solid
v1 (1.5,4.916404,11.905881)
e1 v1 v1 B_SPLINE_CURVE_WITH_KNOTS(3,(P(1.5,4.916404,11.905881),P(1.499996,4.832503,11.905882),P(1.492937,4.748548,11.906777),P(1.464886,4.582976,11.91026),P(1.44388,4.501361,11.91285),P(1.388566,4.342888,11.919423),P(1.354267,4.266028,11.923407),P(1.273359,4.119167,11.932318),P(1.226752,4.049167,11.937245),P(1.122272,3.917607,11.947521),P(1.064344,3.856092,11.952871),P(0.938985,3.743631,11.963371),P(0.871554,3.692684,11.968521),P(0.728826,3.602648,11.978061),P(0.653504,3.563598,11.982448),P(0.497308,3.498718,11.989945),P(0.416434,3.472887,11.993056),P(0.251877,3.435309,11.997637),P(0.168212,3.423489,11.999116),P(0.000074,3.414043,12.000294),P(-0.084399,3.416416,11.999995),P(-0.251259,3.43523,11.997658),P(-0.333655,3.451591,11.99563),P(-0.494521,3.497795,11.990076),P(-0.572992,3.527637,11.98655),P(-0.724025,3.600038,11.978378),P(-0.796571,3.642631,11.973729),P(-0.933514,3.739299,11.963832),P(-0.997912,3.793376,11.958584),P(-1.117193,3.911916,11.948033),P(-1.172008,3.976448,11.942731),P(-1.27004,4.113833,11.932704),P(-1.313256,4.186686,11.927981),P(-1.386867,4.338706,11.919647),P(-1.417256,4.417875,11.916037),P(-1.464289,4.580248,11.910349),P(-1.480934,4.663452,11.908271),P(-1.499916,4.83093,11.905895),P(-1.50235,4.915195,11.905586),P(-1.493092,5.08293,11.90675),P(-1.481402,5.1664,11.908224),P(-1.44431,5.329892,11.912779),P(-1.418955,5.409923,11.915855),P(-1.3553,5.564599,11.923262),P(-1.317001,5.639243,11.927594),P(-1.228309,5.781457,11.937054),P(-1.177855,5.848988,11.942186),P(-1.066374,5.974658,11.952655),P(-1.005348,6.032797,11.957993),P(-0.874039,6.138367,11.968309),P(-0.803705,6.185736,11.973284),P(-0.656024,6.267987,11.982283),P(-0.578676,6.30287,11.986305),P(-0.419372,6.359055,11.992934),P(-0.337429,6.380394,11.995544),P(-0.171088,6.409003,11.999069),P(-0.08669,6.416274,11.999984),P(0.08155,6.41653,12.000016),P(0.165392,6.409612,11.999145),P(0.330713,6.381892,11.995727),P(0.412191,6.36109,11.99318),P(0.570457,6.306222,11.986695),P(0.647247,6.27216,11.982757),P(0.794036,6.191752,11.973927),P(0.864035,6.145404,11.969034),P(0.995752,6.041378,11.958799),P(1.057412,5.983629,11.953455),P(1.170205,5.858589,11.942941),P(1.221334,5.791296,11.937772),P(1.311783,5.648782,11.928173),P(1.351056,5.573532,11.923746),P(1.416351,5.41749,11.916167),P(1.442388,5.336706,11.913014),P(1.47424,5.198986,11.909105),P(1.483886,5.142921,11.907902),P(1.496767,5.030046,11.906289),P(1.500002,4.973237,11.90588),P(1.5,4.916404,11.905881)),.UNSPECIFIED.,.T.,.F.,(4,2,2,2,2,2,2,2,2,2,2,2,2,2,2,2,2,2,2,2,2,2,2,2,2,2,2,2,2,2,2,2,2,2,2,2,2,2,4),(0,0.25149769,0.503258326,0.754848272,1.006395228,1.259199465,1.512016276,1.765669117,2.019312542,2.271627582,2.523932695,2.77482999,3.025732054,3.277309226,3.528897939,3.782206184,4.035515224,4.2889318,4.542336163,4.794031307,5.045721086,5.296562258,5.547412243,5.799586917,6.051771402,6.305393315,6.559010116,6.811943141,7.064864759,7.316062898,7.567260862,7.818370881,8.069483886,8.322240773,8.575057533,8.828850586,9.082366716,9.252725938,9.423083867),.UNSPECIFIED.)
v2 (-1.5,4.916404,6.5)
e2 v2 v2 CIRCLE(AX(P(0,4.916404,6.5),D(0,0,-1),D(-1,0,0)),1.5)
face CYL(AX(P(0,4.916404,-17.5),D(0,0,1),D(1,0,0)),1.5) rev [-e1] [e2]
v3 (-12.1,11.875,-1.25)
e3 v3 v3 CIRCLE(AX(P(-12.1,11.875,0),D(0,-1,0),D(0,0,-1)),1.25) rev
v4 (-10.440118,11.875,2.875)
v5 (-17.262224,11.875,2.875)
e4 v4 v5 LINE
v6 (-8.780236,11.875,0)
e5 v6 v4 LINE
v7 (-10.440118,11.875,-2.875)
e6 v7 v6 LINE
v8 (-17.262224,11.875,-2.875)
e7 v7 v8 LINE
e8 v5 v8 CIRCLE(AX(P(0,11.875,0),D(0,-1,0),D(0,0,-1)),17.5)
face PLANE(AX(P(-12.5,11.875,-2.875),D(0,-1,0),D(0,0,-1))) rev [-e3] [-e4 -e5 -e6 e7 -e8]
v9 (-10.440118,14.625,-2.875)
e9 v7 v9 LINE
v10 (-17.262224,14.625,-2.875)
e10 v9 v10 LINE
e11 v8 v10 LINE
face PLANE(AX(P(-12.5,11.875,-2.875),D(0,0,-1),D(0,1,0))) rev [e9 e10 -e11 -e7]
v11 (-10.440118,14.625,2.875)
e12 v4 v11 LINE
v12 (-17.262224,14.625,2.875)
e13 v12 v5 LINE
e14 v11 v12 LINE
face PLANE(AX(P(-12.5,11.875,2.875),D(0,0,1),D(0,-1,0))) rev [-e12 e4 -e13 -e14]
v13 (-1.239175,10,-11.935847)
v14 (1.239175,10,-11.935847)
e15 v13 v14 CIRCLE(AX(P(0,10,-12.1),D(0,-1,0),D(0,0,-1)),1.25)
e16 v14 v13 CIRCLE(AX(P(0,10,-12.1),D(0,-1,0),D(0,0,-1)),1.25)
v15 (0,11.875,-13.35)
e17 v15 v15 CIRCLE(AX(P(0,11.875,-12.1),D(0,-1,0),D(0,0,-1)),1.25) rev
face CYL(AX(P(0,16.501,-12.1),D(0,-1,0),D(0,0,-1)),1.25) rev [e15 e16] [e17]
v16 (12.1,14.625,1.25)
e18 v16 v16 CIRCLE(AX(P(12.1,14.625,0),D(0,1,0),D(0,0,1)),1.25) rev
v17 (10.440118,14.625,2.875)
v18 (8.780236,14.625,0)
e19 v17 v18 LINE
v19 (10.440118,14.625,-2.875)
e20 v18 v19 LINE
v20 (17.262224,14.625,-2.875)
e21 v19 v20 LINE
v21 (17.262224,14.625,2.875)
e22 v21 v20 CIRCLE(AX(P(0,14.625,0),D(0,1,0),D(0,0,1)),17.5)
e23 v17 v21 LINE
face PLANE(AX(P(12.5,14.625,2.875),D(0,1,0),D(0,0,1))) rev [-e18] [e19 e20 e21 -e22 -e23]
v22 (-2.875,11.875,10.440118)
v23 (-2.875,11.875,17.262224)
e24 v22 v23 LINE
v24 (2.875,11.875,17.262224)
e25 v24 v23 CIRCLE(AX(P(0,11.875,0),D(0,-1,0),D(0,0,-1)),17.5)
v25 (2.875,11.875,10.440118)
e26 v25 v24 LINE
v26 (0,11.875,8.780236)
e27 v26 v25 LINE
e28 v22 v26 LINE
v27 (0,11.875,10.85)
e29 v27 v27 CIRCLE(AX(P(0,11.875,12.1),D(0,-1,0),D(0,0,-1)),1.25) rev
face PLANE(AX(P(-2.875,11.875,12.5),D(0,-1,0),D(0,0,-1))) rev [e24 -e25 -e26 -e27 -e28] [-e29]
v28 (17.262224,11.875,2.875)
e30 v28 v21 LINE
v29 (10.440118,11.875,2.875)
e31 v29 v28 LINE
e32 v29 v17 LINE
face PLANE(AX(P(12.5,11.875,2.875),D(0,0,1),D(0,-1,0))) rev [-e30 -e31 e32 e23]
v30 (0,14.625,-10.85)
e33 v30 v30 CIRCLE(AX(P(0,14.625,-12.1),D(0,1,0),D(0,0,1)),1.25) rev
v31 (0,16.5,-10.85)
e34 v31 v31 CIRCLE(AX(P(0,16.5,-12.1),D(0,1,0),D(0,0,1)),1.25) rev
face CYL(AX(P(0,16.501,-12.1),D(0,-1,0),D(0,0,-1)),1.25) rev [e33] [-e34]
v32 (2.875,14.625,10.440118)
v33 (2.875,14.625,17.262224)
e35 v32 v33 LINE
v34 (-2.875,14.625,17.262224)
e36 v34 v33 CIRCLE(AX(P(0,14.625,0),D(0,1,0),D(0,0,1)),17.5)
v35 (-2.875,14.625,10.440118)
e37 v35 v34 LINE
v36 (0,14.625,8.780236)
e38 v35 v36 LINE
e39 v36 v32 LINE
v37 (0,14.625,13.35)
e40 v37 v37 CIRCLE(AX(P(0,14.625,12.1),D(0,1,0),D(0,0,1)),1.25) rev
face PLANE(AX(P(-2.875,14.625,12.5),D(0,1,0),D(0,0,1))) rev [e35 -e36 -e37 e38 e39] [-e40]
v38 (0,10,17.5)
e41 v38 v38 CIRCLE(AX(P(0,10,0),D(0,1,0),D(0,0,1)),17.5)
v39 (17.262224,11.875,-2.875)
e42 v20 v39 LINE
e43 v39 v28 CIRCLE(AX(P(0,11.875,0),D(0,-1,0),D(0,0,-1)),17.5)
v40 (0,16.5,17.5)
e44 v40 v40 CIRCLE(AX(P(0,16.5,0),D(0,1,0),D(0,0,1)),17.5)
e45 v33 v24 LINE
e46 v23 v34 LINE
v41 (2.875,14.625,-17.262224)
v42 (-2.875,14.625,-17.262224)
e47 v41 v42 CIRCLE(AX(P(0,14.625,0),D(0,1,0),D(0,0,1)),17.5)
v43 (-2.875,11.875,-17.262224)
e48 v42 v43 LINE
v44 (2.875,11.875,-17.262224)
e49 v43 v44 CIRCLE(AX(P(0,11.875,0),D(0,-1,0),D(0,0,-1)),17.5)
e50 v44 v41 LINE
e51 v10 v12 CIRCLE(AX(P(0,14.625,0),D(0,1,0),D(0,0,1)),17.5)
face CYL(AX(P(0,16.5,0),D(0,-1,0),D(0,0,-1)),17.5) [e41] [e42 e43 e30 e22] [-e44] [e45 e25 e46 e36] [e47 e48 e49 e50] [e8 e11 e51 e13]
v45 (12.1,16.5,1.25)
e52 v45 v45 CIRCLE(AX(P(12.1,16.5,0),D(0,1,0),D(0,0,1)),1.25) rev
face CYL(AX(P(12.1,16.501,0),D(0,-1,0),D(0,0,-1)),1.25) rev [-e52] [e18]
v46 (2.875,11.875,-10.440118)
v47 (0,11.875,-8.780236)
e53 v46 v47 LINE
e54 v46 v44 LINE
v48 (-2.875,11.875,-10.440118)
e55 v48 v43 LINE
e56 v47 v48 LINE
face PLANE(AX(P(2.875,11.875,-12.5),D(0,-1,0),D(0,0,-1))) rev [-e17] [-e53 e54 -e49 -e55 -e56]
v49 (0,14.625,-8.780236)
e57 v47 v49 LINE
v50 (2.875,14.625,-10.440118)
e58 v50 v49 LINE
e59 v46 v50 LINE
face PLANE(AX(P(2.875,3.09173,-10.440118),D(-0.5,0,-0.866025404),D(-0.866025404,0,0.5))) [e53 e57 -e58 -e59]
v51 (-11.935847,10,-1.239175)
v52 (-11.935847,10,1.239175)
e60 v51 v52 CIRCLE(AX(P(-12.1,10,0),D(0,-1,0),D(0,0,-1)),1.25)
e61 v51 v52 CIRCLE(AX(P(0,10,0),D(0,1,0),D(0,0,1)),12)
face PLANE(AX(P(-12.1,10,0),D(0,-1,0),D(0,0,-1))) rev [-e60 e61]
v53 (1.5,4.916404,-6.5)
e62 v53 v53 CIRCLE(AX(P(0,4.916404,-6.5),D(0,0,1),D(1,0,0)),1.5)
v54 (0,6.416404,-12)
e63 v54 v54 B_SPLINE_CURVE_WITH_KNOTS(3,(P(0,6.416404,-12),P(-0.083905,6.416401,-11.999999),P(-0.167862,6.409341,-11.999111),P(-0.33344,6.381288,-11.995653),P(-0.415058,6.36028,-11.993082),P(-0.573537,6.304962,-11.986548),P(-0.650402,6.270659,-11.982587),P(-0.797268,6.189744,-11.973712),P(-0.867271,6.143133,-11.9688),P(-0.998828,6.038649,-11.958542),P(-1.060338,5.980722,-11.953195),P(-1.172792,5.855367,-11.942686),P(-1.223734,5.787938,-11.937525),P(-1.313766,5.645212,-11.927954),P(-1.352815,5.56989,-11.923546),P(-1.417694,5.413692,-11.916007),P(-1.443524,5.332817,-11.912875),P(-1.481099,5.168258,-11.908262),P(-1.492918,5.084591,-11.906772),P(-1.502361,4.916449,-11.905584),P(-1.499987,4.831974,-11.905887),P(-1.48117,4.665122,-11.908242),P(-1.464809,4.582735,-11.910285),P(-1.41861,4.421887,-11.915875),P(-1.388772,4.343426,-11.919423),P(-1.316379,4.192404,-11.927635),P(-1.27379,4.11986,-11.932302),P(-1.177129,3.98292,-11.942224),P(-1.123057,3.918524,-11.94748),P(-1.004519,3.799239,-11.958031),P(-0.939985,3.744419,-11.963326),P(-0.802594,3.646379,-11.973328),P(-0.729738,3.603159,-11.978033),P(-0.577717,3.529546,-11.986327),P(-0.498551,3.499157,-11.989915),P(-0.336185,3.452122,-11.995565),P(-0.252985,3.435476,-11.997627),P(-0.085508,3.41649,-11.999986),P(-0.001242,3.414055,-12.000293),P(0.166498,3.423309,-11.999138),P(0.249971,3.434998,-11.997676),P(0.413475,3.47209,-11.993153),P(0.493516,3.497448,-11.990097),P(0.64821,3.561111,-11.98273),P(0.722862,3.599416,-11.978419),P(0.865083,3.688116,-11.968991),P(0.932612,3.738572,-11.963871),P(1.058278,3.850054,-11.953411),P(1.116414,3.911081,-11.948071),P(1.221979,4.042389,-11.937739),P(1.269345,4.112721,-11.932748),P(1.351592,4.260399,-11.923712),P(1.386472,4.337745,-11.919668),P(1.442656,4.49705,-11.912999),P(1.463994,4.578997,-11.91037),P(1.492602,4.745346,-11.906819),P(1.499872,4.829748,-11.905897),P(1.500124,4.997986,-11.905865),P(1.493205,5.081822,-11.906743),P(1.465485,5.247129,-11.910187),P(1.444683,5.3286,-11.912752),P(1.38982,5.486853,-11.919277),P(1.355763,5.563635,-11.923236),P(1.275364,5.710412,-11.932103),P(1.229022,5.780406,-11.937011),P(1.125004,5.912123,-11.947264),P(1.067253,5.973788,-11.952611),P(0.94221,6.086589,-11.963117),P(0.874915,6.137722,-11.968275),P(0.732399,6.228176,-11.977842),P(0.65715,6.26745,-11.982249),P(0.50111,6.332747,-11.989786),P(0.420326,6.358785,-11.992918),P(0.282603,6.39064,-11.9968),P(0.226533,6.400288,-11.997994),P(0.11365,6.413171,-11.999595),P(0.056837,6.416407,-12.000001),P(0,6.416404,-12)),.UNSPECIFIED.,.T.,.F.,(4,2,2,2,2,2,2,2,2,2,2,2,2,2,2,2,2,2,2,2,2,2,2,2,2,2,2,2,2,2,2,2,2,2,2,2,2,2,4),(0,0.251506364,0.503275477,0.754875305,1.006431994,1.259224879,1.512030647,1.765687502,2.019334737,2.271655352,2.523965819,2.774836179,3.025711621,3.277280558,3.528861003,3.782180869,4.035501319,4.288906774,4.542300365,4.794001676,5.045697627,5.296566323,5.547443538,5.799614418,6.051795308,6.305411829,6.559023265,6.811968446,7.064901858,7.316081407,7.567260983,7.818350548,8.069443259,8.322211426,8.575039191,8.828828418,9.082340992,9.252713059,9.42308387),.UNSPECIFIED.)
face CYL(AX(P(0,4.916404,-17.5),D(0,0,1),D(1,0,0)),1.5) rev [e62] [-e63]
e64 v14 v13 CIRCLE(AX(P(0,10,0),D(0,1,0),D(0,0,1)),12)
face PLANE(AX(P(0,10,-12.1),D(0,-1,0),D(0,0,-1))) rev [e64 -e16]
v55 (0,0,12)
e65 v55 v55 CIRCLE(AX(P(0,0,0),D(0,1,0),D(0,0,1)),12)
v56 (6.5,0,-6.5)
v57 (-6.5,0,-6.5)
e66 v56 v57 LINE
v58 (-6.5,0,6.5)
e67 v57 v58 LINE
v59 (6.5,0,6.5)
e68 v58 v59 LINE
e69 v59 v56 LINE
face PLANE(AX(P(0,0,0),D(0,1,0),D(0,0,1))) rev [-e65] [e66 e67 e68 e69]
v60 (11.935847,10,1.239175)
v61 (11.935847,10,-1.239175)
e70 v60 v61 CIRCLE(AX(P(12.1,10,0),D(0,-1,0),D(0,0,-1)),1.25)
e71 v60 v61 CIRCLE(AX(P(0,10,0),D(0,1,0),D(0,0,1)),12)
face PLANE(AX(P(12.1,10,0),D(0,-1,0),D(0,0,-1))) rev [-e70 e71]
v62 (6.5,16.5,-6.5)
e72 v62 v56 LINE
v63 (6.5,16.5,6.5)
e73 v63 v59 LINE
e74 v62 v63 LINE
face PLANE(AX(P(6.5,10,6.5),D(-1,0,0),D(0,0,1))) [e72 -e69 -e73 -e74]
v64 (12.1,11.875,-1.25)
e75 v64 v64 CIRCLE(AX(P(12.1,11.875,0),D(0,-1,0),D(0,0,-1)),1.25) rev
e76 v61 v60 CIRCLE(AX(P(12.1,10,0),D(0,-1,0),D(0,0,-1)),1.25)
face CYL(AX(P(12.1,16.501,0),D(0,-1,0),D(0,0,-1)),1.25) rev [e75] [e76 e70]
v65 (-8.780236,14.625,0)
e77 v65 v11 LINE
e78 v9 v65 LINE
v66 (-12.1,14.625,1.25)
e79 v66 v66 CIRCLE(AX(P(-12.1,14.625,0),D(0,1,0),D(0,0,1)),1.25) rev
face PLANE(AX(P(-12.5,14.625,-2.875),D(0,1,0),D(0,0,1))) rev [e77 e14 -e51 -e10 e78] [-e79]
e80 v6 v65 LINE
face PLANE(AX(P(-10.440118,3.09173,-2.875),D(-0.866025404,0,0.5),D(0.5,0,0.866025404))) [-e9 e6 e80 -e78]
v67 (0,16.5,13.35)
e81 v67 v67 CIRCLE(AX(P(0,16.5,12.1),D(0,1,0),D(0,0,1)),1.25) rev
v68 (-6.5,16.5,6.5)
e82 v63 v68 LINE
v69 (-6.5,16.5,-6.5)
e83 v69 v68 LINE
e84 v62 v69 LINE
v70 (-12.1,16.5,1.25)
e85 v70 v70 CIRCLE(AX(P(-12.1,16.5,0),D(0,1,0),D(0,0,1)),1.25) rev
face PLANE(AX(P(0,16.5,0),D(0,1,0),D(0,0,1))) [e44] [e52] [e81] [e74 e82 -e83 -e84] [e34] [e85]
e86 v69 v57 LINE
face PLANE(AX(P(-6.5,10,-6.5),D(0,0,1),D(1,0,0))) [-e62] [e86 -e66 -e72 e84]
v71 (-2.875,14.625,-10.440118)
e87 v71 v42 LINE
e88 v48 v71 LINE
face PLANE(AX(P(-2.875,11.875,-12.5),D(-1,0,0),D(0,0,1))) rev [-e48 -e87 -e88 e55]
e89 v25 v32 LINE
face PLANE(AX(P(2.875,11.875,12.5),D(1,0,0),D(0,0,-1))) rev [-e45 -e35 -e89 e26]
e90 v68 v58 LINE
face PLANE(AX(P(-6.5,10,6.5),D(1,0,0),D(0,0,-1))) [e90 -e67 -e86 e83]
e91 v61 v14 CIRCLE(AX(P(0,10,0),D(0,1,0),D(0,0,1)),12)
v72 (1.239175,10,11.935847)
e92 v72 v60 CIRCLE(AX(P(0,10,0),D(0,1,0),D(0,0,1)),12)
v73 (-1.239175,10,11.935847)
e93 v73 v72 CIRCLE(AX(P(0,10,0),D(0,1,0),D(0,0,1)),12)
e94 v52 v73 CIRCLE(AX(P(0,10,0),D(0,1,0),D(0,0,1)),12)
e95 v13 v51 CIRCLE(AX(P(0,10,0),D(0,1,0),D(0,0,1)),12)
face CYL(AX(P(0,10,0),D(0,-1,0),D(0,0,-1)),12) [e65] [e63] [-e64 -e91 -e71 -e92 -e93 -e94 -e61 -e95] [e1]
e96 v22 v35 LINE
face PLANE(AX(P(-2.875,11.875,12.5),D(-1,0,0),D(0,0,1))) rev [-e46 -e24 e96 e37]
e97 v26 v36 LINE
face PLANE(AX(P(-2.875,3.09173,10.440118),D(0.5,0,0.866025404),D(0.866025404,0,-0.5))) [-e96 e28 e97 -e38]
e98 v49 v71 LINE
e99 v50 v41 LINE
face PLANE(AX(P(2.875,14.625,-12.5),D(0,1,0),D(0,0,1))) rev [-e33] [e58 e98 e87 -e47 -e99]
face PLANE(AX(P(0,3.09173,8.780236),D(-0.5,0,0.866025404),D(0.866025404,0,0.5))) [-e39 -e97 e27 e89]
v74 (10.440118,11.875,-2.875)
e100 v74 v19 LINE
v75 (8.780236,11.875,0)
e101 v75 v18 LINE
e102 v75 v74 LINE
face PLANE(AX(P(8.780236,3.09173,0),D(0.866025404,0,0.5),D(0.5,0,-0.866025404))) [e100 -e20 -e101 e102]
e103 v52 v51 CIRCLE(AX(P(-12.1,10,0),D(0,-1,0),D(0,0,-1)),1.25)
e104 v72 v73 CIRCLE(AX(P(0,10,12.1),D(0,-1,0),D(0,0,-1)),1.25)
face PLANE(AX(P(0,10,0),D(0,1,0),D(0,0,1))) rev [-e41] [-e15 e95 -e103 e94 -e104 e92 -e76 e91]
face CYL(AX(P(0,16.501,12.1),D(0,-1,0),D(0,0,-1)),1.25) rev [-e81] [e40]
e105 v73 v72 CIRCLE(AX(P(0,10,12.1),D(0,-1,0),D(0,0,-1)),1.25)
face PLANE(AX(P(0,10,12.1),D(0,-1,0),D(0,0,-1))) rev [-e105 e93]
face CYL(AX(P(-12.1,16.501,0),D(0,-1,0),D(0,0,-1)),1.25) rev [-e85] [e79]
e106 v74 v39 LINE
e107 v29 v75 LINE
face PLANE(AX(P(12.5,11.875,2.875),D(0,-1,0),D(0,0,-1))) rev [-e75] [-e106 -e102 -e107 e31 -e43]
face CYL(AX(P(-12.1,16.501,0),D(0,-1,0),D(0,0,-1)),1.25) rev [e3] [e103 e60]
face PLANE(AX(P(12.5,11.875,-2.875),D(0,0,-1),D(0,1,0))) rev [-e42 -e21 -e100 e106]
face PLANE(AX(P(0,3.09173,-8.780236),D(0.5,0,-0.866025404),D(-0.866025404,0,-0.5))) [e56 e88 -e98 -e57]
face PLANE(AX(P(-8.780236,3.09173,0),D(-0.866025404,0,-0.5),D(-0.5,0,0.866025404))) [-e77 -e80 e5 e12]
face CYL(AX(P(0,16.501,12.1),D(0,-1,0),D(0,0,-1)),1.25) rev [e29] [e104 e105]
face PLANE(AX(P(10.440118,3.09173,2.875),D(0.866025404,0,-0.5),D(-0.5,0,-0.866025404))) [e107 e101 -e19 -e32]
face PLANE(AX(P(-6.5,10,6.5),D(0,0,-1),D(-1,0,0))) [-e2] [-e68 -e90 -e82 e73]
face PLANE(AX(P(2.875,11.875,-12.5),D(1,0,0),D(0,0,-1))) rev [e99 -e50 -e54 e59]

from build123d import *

# Parameters (mm, degrees)
SKETCH1_R                      = 12
SKETCH1_W                      = 13
SKETCH1_H                      = 13
BOSS_EXTRUDE1_DEPTH            = 10
SKETCH2_R                      = 17.5
BOSS_EXTRUDE2_DEPTH            = 6.5
CUT_EXTRUDE1_REACH             = 28.693
SKETCH3_R                      = 1.25
CUT_EXTRUDE2_DEPTH             = 30.744747435
CUT_EXTRUDE2_DEPTH_BACK        = 30.744747435
SKETCH4_R                      = 1.5
CUT_EXTRUDE3_REACH             = 28.693
SKETCH6_W                      = 13
SKETCH6_H                      = 13
CUT_EXTRUDE3_DIRECTION_2_DEPTH = 10
SKETCH8_W                      = 5.75
SKETCH8_H                      = 2.75
CUT_EXTRUDE4_DEPTH             = 5
CUT_EXTRUDE5_DEPTH             = 2.75
CIRPATTERN1_START              = 11.875
CIRPATTERN1_OUTLINE_R          = 1.25
CIRPATTERN1_DEPTH              = 2.75


# Read off the part's stored shape, not the designer's step: CirPattern1
with BuildPart() as part:
    # Sketch1 → Boss-Extrude1 (new body)
    with BuildSketch(Plane(origin=(0, 0, 0), x_dir=(1, 0, 0), z_dir=(0, 1, 0))):
        with Locations(Location((0, 0, 0), (0, 0, 270))):
            Circle(SKETCH1_R)
        Rectangle(SKETCH1_W, SKETCH1_H, mode=Mode.SUBTRACT)
    extrude(amount=BOSS_EXTRUDE1_DEPTH)

    # Sketch2 → Boss-Extrude2 (add)
    with BuildSketch(Plane(origin=(0, 10, 0), x_dir=(1, 0, 0), z_dir=(0, 1, 0))):
        with Locations(Location((0, 0, 0), (0, 0, 90))):
            Circle(SKETCH2_R)
    extrude(amount=BOSS_EXTRUDE2_DEPTH)

    # Sketch3 → Cut-Extrude1 (cut, up to next)
    with BuildSketch(Plane.XZ.offset(-10), mode=Mode.PRIVATE) as cut_extrude1_sk1:
        with Locations(Location((12.1, 0, 0), (0, 0, 262.453989537))):
            Circle(SKETCH3_R)
    cut_extrude1_tool1 = extrude(cut_extrude1_sk1.sketch, amount=-CUT_EXTRUDE1_REACH, mode=Mode.PRIVATE) & part.part
    # Sketch3 → Cut-Extrude1 (cut, up to next)
    with BuildSketch(Plane.XZ.offset(-10), mode=Mode.PRIVATE) as cut_extrude1_sk2:
        with Locations(Location((0, -12.1, 0), (0, 0, 172.453989537))):
            Circle(SKETCH3_R)
    cut_extrude1_tool2 = extrude(cut_extrude1_sk2.sketch, amount=-CUT_EXTRUDE1_REACH, mode=Mode.PRIVATE) & part.part
    # Sketch3 → Cut-Extrude1 (cut, up to next)
    with BuildSketch(Plane.XZ.offset(-10), mode=Mode.PRIVATE) as cut_extrude1_sk3:
        with Locations(Location((-12.1, 0, 0), (0, 0, 277.546010463))):
            Circle(SKETCH3_R)
    cut_extrude1_tool3 = extrude(cut_extrude1_sk3.sketch, amount=-CUT_EXTRUDE1_REACH, mode=Mode.PRIVATE) & part.part
    # Sketch3 → Cut-Extrude1 (cut, up to next)
    with BuildSketch(Plane.XZ.offset(-10), mode=Mode.PRIVATE) as cut_extrude1_sk4:
        with Locations(Location((0, 12.1, 0), (0, 0, 187.546010463))):
            Circle(SKETCH3_R)
    cut_extrude1_tool4 = extrude(cut_extrude1_sk4.sketch, amount=-CUT_EXTRUDE1_REACH, mode=Mode.PRIVATE) & part.part
    add(cut_extrude1_tool1.solids().sort_by_distance((12.1, 10, 0))[0], mode=Mode.SUBTRACT)
    add(cut_extrude1_tool2.solids().sort_by_distance((0, 10, -12.1))[0], mode=Mode.SUBTRACT)
    add(cut_extrude1_tool3.solids().sort_by_distance((-12.1, 10, 0))[0], mode=Mode.SUBTRACT)
    add(cut_extrude1_tool4.solids().sort_by_distance((0, 10, 12.1))[0], mode=Mode.SUBTRACT)

    # Sketch4 → Cut-Extrude2 (cut, two sides: drawn at the far end of the back side and taken through both)
    with BuildSketch(Plane.XY.offset(-CUT_EXTRUDE2_DEPTH_BACK)):
        with Locations((0, 4.916404418)):
            Circle(SKETCH4_R)
    extrude(amount=CUT_EXTRUDE2_DEPTH + CUT_EXTRUDE2_DEPTH_BACK, mode=Mode.SUBTRACT)

    # Sketch6 → Cut-Extrude3 (cut, up to next)
    with BuildSketch(Plane(origin=(0, 10, 0), x_dir=(-1, 0, 0), z_dir=(0, -1, 0)), mode=Mode.PRIVATE) as cut_extrude3_sk1:
        Rectangle(SKETCH6_W, SKETCH6_H)
    cut_extrude3_tool1 = extrude(cut_extrude3_sk1.sketch, amount=-CUT_EXTRUDE3_REACH, mode=Mode.PRIVATE) & part.part
    add(cut_extrude3_tool1.solids().sort_by_distance((0, 10, 0))[0], mode=Mode.SUBTRACT)

    # Sketch6 → Cut-Extrude3 direction 2 (cut)
    with BuildSketch(Plane(origin=(0, 10, 0), x_dir=(-1, 0, 0), z_dir=(0, -1, 0))):
        Rectangle(SKETCH6_W, SKETCH6_H)
    extrude(amount=CUT_EXTRUDE3_DIRECTION_2_DEPTH, mode=Mode.SUBTRACT)

    # Sketch8 → Cut-Extrude4 (cut)
    with BuildSketch(Plane(origin=(17.5, 0, 0), x_dir=(0, 0, -1), z_dir=(1, 0, 0))):
        with Locations((0, 13.25)):
            Rectangle(SKETCH8_W, SKETCH8_H)
    extrude(amount=-CUT_EXTRUDE4_DEPTH, mode=Mode.SUBTRACT)

    # Sketch9 → Cut-Extrude5 (cut)
    with BuildSketch(Plane.XZ.offset(-14.625)):
        Polygon((15.419764048, 0), (13.759882024, 2.875), (10.440117976, 2.875), (8.780235952, 0), (10.440117976, -2.875), (13.759882024, -2.875), align=None)
    extrude(amount=CUT_EXTRUDE5_DEPTH, mode=Mode.SUBTRACT)

    # CirPattern1 outline → CirPattern1 (cut)
    # profile 1 of 3: a face of its own
    with BuildSketch(Plane(origin=(0, 0, 0), x_dir=(1, 0, 0), z_dir=(0, 1, 0)).offset(CIRPATTERN1_START)):
        with BuildLine():
            Line((-8.780235952, 0), (-10.440117976, 2.875))
            Line((-10.440117976, 2.875), (-17.26222393, 2.875))
            ThreePointArc((-17.26222393, 2.875), (-17.5, 0), (-17.26222393, -2.875))
            Line((-17.26222393, -2.875), (-10.440117976, -2.875))
            Line((-10.440117976, -2.875), (-8.780235952, 0))
        make_face()
        with Locations((-12.1, 0)):
            Circle(CIRPATTERN1_OUTLINE_R, mode=Mode.SUBTRACT)
    # profile 2 of 3: a face of its own
    with BuildSketch(Plane(origin=(0, 0, 0), x_dir=(1, 0, 0), z_dir=(0, 1, 0)).offset(CIRPATTERN1_START)):
        with BuildLine():
            ThreePointArc((2.875, 17.26222393), (0, 17.5), (-2.875, 17.26222393))
            Line((-2.875, 17.26222393), (-2.875, 10.440117976))
            Line((-2.875, 10.440117976), (0, 8.780235952))
            Line((0, 8.780235952), (2.875, 10.440117976))
            Line((2.875, 10.440117976), (2.875, 17.26222393))
        make_face()
        with Locations((0, 12.1)):
            Circle(CIRPATTERN1_OUTLINE_R, mode=Mode.SUBTRACT)
    # profile 3 of 3: a face of its own
    with BuildSketch(Plane(origin=(0, 0, 0), x_dir=(1, 0, 0), z_dir=(0, 1, 0)).offset(CIRPATTERN1_START)):
        with BuildLine():
            Line((-2.875, -10.440117976), (-2.875, -17.26222393))
            ThreePointArc((-2.875, -17.26222393), (0, -17.5), (2.875, -17.26222393))
            Line((2.875, -17.26222393), (2.875, -10.440117976))
            Line((2.875, -10.440117976), (0, -8.780235952))
            Line((0, -8.780235952), (-2.875, -10.440117976))
        make_face()
        with Locations((0, -12.1)):
            Circle(CIRPATTERN1_OUTLINE_R, mode=Mode.SUBTRACT)
    extrude(amount=CIRPATTERN1_DEPTH, mode=Mode.SUBTRACT)


solid = part.part
